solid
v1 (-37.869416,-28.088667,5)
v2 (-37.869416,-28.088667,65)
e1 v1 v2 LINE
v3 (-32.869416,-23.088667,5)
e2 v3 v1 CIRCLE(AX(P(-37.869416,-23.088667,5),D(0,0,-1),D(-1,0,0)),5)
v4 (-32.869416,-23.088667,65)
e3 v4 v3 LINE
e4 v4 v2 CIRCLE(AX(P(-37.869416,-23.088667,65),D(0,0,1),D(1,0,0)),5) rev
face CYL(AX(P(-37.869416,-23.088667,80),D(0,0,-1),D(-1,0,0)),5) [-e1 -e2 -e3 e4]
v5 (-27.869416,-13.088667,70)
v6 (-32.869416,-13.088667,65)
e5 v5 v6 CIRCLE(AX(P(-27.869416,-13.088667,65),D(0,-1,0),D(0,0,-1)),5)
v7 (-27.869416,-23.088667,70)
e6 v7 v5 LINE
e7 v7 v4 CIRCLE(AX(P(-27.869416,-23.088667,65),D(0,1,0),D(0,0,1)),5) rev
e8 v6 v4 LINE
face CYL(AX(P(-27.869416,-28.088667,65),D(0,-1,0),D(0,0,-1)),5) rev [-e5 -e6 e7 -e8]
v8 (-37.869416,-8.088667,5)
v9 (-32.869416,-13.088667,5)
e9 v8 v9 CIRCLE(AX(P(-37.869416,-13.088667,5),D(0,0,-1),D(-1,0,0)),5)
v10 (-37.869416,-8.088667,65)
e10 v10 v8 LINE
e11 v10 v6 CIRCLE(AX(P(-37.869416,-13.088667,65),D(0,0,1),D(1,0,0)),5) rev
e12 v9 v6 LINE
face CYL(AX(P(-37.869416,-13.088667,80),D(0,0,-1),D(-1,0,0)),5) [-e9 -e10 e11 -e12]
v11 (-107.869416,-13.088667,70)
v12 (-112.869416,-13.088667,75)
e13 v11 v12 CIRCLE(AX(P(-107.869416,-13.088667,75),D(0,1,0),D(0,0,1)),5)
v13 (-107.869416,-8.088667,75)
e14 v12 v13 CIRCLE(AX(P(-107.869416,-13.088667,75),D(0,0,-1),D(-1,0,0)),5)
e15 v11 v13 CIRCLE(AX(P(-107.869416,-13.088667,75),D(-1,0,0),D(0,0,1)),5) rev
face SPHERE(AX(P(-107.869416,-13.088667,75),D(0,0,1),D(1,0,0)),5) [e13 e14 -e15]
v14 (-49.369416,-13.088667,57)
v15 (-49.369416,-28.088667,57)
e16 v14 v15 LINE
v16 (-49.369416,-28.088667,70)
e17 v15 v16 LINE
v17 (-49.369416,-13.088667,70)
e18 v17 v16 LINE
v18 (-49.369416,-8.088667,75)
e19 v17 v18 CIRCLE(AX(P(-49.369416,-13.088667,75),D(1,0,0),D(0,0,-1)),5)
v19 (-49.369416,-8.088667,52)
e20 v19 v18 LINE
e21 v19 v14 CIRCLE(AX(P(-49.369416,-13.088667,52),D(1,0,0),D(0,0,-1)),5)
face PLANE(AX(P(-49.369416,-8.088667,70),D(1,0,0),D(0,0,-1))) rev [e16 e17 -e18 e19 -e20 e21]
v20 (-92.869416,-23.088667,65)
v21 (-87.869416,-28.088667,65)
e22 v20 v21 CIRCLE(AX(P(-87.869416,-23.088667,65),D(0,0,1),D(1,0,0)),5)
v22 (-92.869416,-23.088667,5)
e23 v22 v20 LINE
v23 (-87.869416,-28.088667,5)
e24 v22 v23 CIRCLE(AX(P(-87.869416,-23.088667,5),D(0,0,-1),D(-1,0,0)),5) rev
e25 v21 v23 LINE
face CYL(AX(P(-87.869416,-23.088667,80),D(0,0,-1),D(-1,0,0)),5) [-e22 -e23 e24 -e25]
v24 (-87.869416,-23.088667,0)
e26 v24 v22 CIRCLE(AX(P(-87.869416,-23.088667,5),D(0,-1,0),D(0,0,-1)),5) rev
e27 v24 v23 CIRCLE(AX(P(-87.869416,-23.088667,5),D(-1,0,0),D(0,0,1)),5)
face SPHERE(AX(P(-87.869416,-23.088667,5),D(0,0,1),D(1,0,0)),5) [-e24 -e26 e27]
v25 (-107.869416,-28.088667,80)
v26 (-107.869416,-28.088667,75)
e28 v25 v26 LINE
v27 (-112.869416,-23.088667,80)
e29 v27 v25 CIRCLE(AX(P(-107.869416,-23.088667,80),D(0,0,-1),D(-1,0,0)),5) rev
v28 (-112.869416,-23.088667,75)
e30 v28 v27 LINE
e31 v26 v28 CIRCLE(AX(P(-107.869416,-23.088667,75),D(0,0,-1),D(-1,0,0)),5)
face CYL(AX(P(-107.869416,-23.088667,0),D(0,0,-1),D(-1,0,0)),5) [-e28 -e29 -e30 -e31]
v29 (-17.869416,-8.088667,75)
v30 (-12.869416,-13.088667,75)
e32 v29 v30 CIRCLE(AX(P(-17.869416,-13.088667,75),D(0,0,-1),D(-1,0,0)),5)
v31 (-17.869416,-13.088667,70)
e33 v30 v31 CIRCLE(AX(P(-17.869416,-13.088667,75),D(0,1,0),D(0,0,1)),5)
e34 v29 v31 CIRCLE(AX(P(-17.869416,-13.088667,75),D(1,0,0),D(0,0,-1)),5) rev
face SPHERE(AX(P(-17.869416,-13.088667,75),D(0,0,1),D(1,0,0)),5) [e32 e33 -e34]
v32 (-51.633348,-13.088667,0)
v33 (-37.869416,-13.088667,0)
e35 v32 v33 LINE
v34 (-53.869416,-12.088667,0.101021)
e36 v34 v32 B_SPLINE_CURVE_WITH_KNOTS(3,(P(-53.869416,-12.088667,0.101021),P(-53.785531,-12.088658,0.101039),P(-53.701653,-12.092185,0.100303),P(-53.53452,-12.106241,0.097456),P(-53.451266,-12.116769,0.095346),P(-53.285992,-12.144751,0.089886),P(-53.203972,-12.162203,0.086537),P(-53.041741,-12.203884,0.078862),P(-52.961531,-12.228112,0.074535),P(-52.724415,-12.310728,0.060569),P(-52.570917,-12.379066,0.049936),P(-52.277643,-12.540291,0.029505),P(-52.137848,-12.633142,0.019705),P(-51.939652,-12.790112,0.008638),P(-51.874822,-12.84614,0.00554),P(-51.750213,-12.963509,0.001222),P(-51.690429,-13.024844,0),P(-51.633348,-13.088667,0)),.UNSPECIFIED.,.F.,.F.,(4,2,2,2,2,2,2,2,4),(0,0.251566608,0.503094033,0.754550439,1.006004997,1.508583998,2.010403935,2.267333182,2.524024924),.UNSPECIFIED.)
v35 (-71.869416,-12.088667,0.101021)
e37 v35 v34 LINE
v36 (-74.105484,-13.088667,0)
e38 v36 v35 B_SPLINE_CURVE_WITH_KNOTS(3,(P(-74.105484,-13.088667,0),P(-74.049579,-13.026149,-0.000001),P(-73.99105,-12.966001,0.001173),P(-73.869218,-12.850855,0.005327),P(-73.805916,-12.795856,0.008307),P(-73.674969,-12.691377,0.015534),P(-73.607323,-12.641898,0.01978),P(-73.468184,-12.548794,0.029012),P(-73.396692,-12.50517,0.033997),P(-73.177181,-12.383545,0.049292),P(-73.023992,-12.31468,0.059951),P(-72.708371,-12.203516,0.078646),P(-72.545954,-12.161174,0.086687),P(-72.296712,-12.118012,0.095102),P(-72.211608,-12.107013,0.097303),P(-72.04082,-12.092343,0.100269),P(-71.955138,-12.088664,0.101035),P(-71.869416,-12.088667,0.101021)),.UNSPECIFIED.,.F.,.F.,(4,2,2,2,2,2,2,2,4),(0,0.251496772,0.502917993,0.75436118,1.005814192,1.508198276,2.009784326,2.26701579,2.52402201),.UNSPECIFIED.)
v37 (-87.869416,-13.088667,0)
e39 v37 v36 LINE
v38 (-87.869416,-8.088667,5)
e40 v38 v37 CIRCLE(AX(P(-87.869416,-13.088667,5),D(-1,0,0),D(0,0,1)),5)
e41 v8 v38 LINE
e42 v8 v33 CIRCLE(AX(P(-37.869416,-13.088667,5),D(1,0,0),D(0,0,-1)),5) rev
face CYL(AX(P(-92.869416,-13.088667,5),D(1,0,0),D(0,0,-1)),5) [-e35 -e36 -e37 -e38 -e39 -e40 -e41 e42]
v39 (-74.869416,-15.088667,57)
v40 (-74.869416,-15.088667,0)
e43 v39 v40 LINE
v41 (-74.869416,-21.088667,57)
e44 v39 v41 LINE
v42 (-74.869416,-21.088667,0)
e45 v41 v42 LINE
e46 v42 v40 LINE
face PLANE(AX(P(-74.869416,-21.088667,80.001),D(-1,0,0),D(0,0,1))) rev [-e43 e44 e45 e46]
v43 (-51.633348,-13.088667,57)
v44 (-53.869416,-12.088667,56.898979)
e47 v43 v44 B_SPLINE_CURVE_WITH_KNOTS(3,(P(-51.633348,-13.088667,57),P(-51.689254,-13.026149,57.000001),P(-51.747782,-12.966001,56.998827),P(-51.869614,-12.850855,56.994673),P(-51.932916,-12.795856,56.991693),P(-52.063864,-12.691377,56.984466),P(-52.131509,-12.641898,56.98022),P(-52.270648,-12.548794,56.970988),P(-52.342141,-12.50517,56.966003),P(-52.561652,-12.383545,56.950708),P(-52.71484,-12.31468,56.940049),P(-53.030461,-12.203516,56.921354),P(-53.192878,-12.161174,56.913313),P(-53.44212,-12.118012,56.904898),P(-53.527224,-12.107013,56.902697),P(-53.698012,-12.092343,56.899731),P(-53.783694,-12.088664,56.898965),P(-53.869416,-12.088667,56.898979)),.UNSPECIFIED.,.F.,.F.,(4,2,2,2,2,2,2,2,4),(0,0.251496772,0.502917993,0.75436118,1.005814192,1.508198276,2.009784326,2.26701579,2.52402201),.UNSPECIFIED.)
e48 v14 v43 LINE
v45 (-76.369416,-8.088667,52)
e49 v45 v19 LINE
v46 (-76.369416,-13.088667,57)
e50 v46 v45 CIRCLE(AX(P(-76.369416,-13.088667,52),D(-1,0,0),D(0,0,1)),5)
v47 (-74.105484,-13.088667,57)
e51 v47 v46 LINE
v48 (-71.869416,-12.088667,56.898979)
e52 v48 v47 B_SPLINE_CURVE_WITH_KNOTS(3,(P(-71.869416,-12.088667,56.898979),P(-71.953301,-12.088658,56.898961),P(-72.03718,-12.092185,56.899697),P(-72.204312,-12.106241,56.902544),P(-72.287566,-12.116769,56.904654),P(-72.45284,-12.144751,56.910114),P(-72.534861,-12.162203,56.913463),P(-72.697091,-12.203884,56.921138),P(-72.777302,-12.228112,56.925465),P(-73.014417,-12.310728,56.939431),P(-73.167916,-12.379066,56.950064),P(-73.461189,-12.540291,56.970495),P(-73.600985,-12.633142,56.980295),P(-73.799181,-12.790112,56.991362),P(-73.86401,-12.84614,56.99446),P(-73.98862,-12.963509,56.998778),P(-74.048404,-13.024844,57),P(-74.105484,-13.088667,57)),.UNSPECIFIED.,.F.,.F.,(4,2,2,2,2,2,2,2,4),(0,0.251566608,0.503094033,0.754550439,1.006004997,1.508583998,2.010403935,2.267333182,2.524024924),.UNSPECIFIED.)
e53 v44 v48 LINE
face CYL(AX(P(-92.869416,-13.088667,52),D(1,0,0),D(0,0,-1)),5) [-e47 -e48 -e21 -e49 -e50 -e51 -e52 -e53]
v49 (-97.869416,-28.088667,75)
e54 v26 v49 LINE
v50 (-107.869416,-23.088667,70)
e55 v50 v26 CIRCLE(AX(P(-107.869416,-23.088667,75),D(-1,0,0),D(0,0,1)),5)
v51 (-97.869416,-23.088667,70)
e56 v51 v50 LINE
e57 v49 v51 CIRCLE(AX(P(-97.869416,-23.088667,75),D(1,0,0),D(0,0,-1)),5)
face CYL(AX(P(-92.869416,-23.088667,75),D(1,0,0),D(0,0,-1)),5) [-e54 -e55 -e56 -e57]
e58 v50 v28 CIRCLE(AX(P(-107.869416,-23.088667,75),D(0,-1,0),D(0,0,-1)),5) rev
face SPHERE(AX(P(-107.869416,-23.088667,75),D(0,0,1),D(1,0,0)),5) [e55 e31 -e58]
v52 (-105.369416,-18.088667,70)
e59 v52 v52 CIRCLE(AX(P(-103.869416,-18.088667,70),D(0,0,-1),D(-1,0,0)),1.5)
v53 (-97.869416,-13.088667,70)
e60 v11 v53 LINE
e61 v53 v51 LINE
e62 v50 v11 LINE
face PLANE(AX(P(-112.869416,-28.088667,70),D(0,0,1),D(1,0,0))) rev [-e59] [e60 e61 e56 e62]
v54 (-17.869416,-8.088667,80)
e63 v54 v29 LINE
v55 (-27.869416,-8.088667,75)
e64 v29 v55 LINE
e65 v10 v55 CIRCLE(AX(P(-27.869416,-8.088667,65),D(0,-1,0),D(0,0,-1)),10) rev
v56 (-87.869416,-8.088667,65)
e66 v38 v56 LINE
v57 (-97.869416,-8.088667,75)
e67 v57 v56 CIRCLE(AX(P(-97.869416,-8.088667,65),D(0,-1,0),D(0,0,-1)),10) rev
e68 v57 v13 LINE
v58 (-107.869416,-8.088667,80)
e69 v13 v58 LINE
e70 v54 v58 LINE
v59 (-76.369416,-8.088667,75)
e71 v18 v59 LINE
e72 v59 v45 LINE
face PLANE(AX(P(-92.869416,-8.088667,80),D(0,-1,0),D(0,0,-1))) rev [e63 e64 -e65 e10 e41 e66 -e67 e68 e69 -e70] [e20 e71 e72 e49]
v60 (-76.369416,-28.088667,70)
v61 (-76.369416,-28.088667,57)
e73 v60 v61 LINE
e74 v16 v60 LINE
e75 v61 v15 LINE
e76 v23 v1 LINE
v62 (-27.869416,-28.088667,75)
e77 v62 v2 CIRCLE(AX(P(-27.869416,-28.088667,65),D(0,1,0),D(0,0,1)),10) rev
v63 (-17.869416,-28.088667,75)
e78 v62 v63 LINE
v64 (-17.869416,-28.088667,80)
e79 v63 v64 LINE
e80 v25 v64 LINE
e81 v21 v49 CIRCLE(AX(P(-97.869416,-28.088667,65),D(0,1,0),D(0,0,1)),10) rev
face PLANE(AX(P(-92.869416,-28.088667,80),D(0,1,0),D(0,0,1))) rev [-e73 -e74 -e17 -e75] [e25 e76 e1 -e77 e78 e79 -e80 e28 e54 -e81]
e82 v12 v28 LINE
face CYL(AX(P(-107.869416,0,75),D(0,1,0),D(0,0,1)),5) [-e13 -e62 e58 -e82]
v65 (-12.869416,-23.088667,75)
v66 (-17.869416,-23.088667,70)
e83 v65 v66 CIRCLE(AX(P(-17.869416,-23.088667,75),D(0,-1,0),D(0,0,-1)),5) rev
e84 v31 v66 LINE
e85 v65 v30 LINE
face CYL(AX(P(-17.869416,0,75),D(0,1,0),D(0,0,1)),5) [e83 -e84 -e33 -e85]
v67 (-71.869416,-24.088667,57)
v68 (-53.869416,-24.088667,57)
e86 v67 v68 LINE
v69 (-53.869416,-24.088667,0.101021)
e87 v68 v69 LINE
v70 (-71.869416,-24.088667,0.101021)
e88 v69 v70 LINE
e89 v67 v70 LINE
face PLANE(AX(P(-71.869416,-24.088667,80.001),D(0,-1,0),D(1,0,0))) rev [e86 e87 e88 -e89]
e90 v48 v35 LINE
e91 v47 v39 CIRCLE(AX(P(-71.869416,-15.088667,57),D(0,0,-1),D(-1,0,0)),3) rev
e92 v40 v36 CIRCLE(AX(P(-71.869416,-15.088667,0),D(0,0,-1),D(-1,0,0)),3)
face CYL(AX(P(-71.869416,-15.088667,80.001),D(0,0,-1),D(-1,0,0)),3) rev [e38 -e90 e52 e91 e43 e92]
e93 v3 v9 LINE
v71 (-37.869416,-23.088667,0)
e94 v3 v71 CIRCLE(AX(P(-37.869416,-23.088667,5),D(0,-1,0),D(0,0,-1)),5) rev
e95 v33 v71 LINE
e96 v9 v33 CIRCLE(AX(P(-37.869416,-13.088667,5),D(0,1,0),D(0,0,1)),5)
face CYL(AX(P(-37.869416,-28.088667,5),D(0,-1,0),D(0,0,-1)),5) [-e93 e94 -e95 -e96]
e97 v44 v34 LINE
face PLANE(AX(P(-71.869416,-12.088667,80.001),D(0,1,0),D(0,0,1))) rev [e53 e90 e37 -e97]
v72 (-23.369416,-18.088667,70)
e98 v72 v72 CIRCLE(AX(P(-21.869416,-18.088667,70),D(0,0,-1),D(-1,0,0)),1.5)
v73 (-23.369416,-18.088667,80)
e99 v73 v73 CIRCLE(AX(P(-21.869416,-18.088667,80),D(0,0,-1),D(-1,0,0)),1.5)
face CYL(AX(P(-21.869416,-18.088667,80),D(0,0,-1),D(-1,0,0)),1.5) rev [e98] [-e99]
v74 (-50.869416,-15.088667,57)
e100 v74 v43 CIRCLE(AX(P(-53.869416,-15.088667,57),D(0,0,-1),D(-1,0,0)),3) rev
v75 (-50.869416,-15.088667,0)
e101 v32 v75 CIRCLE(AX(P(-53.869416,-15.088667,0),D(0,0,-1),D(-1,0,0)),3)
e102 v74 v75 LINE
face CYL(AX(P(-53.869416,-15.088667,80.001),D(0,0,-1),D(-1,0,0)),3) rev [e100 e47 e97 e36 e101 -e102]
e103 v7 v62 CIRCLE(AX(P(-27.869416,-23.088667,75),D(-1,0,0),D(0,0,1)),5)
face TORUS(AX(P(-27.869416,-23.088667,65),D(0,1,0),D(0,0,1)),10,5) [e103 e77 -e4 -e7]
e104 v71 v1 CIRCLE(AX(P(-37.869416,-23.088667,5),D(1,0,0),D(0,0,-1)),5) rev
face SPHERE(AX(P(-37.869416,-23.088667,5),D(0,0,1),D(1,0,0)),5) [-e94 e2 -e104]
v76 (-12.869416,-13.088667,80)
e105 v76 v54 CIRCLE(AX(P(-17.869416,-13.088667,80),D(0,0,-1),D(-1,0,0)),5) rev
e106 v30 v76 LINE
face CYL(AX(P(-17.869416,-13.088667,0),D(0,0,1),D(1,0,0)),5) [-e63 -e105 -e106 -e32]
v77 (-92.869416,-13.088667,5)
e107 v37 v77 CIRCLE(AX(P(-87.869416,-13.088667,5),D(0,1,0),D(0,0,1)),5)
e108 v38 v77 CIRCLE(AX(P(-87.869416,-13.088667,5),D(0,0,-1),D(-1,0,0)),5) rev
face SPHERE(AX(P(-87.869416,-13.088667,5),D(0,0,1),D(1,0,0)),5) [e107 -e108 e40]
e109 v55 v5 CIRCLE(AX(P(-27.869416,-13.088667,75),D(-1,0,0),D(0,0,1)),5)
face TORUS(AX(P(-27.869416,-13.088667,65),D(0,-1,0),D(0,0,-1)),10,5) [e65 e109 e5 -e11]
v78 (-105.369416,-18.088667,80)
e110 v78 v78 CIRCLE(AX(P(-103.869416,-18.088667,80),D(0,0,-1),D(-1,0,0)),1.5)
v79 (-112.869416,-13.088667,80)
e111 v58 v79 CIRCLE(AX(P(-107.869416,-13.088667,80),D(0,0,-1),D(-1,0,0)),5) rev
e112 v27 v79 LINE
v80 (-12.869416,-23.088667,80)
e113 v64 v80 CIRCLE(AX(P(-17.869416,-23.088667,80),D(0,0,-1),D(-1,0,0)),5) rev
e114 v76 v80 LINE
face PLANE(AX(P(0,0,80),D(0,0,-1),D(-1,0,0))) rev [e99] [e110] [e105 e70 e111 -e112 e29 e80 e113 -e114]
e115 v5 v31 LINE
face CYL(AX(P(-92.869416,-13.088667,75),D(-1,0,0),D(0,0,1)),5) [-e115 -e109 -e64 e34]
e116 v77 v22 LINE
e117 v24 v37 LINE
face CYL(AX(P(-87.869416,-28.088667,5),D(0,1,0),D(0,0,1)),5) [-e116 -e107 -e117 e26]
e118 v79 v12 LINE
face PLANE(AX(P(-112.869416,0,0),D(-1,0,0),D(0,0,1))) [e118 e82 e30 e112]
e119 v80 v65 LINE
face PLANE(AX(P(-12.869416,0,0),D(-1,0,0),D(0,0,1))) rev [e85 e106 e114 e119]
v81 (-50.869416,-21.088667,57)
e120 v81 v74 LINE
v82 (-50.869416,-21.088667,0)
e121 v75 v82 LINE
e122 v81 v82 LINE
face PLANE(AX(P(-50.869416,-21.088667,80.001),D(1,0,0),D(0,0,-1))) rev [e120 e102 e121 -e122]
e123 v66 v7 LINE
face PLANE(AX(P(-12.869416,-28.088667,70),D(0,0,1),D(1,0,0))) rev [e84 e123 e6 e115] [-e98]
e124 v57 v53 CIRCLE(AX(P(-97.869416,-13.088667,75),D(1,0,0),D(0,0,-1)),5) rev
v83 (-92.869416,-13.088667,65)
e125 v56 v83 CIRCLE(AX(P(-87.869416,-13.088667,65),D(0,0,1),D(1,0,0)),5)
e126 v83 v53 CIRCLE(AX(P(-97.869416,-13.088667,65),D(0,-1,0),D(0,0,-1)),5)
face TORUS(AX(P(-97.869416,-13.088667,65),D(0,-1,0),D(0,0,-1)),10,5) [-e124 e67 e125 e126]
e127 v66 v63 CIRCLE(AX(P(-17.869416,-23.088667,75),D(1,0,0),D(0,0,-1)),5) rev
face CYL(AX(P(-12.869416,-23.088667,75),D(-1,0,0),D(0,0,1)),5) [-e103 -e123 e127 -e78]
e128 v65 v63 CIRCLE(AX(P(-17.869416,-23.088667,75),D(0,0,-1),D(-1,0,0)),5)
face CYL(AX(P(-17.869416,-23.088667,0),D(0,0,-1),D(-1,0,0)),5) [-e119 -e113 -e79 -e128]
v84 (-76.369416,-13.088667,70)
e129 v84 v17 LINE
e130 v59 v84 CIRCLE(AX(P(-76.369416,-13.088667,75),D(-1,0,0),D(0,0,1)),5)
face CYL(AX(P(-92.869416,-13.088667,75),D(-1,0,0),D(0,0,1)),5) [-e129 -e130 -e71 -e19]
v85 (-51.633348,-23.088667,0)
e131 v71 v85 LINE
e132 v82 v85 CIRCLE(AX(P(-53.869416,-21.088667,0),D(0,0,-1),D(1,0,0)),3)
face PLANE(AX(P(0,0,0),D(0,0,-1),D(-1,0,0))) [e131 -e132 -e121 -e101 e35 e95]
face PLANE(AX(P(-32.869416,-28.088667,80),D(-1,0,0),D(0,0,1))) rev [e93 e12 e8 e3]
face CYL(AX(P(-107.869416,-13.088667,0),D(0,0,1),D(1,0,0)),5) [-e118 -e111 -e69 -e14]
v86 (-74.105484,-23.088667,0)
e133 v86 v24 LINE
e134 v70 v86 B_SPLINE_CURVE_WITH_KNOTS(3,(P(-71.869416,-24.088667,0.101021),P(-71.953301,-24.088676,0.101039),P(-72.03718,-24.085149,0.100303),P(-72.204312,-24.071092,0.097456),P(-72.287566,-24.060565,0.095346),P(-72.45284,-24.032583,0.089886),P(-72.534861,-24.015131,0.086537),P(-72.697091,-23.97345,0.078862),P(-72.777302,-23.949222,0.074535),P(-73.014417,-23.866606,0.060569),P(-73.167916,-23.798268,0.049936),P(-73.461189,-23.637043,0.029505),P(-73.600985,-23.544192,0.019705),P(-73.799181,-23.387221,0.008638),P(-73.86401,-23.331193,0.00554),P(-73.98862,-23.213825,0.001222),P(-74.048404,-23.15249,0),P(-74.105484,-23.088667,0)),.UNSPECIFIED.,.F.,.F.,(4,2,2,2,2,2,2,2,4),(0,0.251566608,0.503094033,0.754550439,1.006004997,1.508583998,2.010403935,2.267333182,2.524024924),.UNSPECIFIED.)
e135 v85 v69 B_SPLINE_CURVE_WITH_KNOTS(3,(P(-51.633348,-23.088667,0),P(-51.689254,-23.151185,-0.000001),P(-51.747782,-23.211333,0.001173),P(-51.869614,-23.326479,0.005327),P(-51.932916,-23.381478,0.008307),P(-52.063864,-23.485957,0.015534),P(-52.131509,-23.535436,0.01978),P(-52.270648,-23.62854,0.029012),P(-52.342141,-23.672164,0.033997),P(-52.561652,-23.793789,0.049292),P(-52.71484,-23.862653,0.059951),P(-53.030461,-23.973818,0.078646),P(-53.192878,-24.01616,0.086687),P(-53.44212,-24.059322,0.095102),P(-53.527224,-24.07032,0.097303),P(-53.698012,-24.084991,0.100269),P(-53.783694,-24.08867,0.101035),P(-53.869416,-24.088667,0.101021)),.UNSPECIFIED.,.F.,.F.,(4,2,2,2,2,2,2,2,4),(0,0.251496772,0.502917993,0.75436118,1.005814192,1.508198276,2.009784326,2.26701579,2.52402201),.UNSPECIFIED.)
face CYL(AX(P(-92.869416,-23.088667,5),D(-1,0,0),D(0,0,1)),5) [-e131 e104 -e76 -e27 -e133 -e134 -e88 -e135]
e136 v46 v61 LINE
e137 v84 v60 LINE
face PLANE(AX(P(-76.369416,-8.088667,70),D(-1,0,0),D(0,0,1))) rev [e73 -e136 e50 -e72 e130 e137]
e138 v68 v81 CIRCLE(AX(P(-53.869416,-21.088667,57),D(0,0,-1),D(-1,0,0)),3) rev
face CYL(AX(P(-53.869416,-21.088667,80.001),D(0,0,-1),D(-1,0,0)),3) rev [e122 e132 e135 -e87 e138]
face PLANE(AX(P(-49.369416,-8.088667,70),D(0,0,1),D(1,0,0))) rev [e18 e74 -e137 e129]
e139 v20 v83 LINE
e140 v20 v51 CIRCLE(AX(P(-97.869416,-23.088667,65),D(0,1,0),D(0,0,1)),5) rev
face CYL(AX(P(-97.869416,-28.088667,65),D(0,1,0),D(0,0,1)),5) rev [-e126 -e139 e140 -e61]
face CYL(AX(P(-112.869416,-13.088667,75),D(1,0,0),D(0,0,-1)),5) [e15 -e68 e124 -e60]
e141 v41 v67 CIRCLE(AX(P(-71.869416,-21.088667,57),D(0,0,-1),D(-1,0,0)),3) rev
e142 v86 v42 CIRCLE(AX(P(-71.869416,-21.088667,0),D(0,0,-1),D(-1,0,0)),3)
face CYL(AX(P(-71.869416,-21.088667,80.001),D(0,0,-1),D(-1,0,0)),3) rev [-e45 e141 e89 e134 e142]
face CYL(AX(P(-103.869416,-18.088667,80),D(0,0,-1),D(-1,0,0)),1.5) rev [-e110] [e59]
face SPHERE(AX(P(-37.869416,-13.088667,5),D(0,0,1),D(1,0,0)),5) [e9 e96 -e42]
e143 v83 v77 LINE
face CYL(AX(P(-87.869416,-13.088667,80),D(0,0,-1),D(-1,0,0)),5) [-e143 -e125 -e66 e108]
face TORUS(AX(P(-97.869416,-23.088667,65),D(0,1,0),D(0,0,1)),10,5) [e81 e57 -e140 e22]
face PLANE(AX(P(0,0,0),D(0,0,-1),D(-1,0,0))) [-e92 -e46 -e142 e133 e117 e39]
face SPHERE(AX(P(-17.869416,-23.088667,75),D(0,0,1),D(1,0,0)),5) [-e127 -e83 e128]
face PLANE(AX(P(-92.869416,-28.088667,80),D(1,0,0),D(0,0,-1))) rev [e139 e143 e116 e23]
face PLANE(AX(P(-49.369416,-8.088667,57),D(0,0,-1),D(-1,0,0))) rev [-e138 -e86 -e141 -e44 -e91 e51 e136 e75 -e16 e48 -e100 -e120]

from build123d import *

# Parameters (mm, degrees)
ESBO_O1_W                = 60
ESBO_O1_H                = 20
RESSALTO_EXTRUS_O1_DEPTH = 80
ESBO_O4_W                = 27
ESBO_O4_H                = 13
CORTE_EXTRUS_O2_DEPTH    = 125.196330299
ESBO_O6_W                = 10
ESBO_O6_H                = 20
RESSALTO_EXTRUS_O2_DEPTH = 20
ESBO_O5_W                = 10
ESBO_O5_H                = 20
RESSALTO_EXTRUS_O3_DEPTH = 20
CORTE_EXTRUS_O4_REACH    = 143.168
FILETE1_R                = 5
ESBO_O8_R                = 1.5
CORTE_EXTRUS_O5_DEPTH    = 136.751531604
FILETE2_R                = 5


with BuildPart() as part:
    # Esboço1 → Ressalto-extrusão1 (new body)
    with BuildSketch(Plane.XY):
        with Locations((-62.86941617, -18.088666872)):
            Rectangle(ESBO_O1_W, ESBO_O1_H)
    extrude(amount=RESSALTO_EXTRUS_O1_DEPTH)

    # Esboço4 → Corte-extrusão2 (cut, through all)
    with BuildSketch(Plane(origin=(0, -28.088666872, 0), x_dir=(-1, 0, 0), z_dir=(0, -1, 0))):
        with Locations((62.86941617, -63.5)):
            Rectangle(ESBO_O4_W, ESBO_O4_H)
    extrude(amount=-CORTE_EXTRUS_O2_DEPTH, mode=Mode.SUBTRACT)

    # Esboço6 → Ressalto-extrusão2 (add)
    with BuildSketch(Plane.ZY.offset(92.86941617)):
        with Locations((75, -18.088666872)):
            Rectangle(ESBO_O6_W, ESBO_O6_H)
    extrude(amount=RESSALTO_EXTRUS_O2_DEPTH)

    # Esboço5 → Ressalto-extrusão3 (add)
    with BuildSketch(Plane(origin=(-32.86941617, 0, 0), x_dir=(0, 0, -1), z_dir=(1, 0, 0))):
        with Locations((-75, -18.088666872)):
            Rectangle(ESBO_O5_W, ESBO_O5_H)
    extrude(amount=RESSALTO_EXTRUS_O3_DEPTH)

    # Esboço7 → Corte-extrusão4 (cut, up to next)
    with BuildSketch(Plane(origin=(0, 0, 0), x_dir=(-1, 0, 0), z_dir=(0, 0, -1)), mode=Mode.PRIVATE) as corte_extrus_o4_sk1:
        with BuildLine():
            Line((71.86941617, -24.088666872), (53.86941617, -24.088666872))
            ThreePointArc((53.86941617, -24.088666872), (51.748095827, -23.209987216), (50.86941617, -21.088666872))
            Line((50.86941617, -21.088666872), (50.86941617, -15.088666872))
            ThreePointArc((50.86941617, -15.088666872), (51.748095827, -12.967346529), (53.86941617, -12.088666872))
            Line((53.86941617, -12.088666872), (71.86941617, -12.088666872))
            ThreePointArc((71.86941617, -12.088666872), (73.990736514, -12.967346529), (74.86941617, -15.088666872))
            Line((74.86941617, -15.088666872), (74.86941617, -21.088666872))
            ThreePointArc((74.86941617, -21.088666872), (73.990736514, -23.209987216), (71.86941617, -24.088666872))
        make_face()
    corte_extrus_o4_tool1 = extrude(corte_extrus_o4_sk1.sketch, amount=-CORTE_EXTRUS_O4_REACH, mode=Mode.PRIVATE) & part.part
    add(corte_extrus_o4_tool1.solids().sort_by_distance((-62.869416, -18.088667, 0))[0], mode=Mode.SUBTRACT)

    # Filete1
    # the kernel refuses this fillet: 5 mm, written as the material it adds along each edge
    with BuildSketch(Plane(origin=(-92.86941617, -28.088666872, 70), x_dir=(0, 0, -1), z_dir=(0, 1, 0)), Plane(origin=(-32.86941617, -28.088666872, 70), x_dir=(1, 0, 0), z_dir=(0, 1, 0))) as filete1_piece_1:
        with BuildLine():
            CenterArc((FILETE1_R, FILETE1_R), FILETE1_R, 180, 90)
            Line((0, FILETE1_R), (0, 0))
            Line((0, 0), (FILETE1_R, 0))
        make_face()
    extrude(amount=20)
    # the kernel refuses this fillet: 5 mm, written as the material it takes off along each edge
    with BuildSketch(Plane(origin=(-12.86941617, -8.088666872, 57.5), x_dir=(0, -1, 0), z_dir=(0, 0, 1)), Plane(origin=(-112.86941617, -28.088666872, 92.5), x_dir=(1, 0, 0), z_dir=(0, 0, -1))) as filete1_2_piece_1:
        with BuildLine():
            CenterArc((FILETE1_R, -FILETE1_R), FILETE1_R, 90, 90)
            Line((0, -FILETE1_R), (0, 0))
            Line((0, 0), (FILETE1_R, 0))
        make_face()
    extrude(amount=35, mode=Mode.SUBTRACT)
    with BuildSketch(Plane(origin=(-112.86941617, -8.088666872, 57.5), x_dir=(0, -1, 0), z_dir=(0, 0, 1)), Plane(origin=(-12.86941617, -28.088666872, 92.5), x_dir=(-1, 0, 0), z_dir=(0, 0, -1))) as filete1_2_piece_2:
        with BuildLine():
            CenterArc((FILETE1_R, FILETE1_R), FILETE1_R, 180, 90)
            Line((0, FILETE1_R), (0, 0))
            Line((0, 0), (FILETE1_R, 0))
        make_face()
    extrude(amount=35, mode=Mode.SUBTRACT)
    with BuildSketch(Plane(origin=(-112.86941617, -40.588666872, 70), x_dir=(1, 0, 0), z_dir=(0, 1, 0)), Plane(origin=(-12.86941617, -40.588666872, 70), x_dir=(0, 0, 1), z_dir=(0, 1, 0)), Plane(origin=(-92.86941617, 4.411333128, 0), x_dir=(0, 0, 1), z_dir=(0, -1, 0)), Plane(origin=(-32.86941617, -40.588666872, 0), x_dir=(0, 0, 1), z_dir=(0, 1, 0))) as filete1_2_piece_3:
        with BuildLine():
            CenterArc((FILETE1_R, -FILETE1_R), FILETE1_R, 90, 90)
            Line((0, -FILETE1_R), (0, 0))
            Line((0, 0), (FILETE1_R, 0))
        make_face()
    extrude(amount=45, mode=Mode.SUBTRACT)
    with BuildSketch(Plane(origin=(-105.36941617, -28.088666872, 0), x_dir=(0, 0, 1), z_dir=(1, 0, 0))) as filete1_2_piece_4:
        with BuildLine():
            CenterArc((FILETE1_R, -FILETE1_R), FILETE1_R, 90, 90)
            Line((0, -FILETE1_R), (0, 0))
            Line((0, 0), (FILETE1_R, 0))
        make_face()
    extrude(amount=85, mode=Mode.SUBTRACT)
    with BuildSketch(Plane(origin=(-20.36941617, -8.088666872, 0), x_dir=(0, -1, 0), z_dir=(-1, 0, 0))) as filete1_2_piece_5:
        with BuildLine():
            CenterArc((FILETE1_R, FILETE1_R), FILETE1_R, 180, 90)
            Line((0, FILETE1_R), (0, 0))
            Line((0, 0), (FILETE1_R, 0))
        make_face()
    extrude(amount=85, mode=Mode.SUBTRACT)
    # the kernel refuses this fillet: 5 mm, written as the material it takes off along each edge
    with BuildSketch(Plane(origin=(-87.86941617, -23.088666872, 5), x_dir=(-1, 0, 0), z_dir=(0, -1, 0))) as filete1_3_piece_1_section:
        Polygon((0, 0), (FILETE1_R, 0), (FILETE1_R, FILETE1_R), (0, FILETE1_R), align=None)
    filete1_3_piece_1 = extrude(amount=FILETE1_R, mode=Mode.PRIVATE)
    filete1_3_piece_1 = filete1_3_piece_1 - Plane(origin=(-87.86941617, -23.088666872, 5), x_dir=(0.7071067811865475, 0, 0.7071067811865475), z_dir=(0, -1, 0)) * Sphere(FILETE1_R, mode=Mode.PRIVATE)
    add(filete1_3_piece_1, mode=Mode.SUBTRACT)
    with BuildSketch(Plane(origin=(-87.86941617, -13.088666872, 5), x_dir=(0, 1, 0), z_dir=(-1, 0, 0))) as filete1_3_piece_2_section:
        Polygon((0, 0), (FILETE1_R, 0), (FILETE1_R, FILETE1_R), (0, FILETE1_R), align=None)
    filete1_3_piece_2 = extrude(amount=FILETE1_R, mode=Mode.PRIVATE)
    filete1_3_piece_2 = filete1_3_piece_2 - Plane(origin=(-87.86941617, -13.088666872, 5), x_dir=(0, -0.7071067811865475, 0.7071067811865475), z_dir=(-1, 0, 0)) * Sphere(FILETE1_R, mode=Mode.PRIVATE)
    add(filete1_3_piece_2, mode=Mode.SUBTRACT)
    with BuildSketch(Plane(origin=(-37.86941617, -13.088666872, 5), x_dir=(0, 1, 0), z_dir=(1, 0, 0))) as filete1_3_piece_3_section:
        Polygon((0, 0), (FILETE1_R, 0), (FILETE1_R, -FILETE1_R), (0, -FILETE1_R), align=None)
    filete1_3_piece_3 = extrude(amount=FILETE1_R, mode=Mode.PRIVATE)
    filete1_3_piece_3 = filete1_3_piece_3 - Plane(origin=(-37.86941617, -13.088666872, 5), x_dir=(0, -0.7071067811865475, 0.7071067811865475), z_dir=(1, 0, 0)) * Sphere(FILETE1_R, mode=Mode.PRIVATE)
    add(filete1_3_piece_3, mode=Mode.SUBTRACT)
    with BuildSketch(Plane(origin=(-37.86941617, -23.088666872, 5), x_dir=(1, 0, 0), z_dir=(0, -1, 0))) as filete1_3_piece_4_section:
        Polygon((0, 0), (FILETE1_R, 0), (FILETE1_R, -FILETE1_R), (0, -FILETE1_R), align=None)
    filete1_3_piece_4 = extrude(amount=FILETE1_R, mode=Mode.PRIVATE)
    filete1_3_piece_4 = filete1_3_piece_4 - Plane(origin=(-37.86941617, -23.088666872, 5), x_dir=(-0.7071067811865475, 0, 0.7071067811865475), z_dir=(0, -1, 0)) * Sphere(FILETE1_R, mode=Mode.PRIVATE)
    add(filete1_3_piece_4, mode=Mode.SUBTRACT)
    with BuildSketch(Plane(origin=(-107.86941617, -23.088666872, 75), x_dir=(0, 0, -1), z_dir=(0, -1, 0))) as filete1_3_piece_5_section:
        Polygon((0, 0), (FILETE1_R, 0), (FILETE1_R, -FILETE1_R), (0, -FILETE1_R), align=None)
    filete1_3_piece_5 = extrude(amount=FILETE1_R, mode=Mode.PRIVATE)
    filete1_3_piece_5 = filete1_3_piece_5 - Plane(origin=(-107.86941617, -23.088666872, 75), x_dir=(0.7071067811865475, 0, 0.7071067811865475), z_dir=(0, -1, 0)) * Sphere(FILETE1_R, mode=Mode.PRIVATE)
    add(filete1_3_piece_5, mode=Mode.SUBTRACT)
    with BuildSketch(Plane(origin=(-17.86941617, -13.088666872, 75), x_dir=(0, 1, 0), z_dir=(0, 0, -1))) as filete1_3_piece_6_section:
        Polygon((0, 0), (FILETE1_R, 0), (FILETE1_R, FILETE1_R), (0, FILETE1_R), align=None)
    filete1_3_piece_6 = extrude(amount=FILETE1_R, mode=Mode.PRIVATE)
    filete1_3_piece_6 = filete1_3_piece_6 - Plane(origin=(-17.86941617, -13.088666872, 75), x_dir=(-0.7071067811865475, -0.7071067811865475, 0), z_dir=(0, 0, -1)) * Sphere(FILETE1_R, mode=Mode.PRIVATE)
    add(filete1_3_piece_6, mode=Mode.SUBTRACT)
    with BuildSketch(Plane(origin=(-17.86941617, -23.088666872, 75), x_dir=(0, 0, -1), z_dir=(0, -1, 0))) as filete1_3_piece_7_section:
        Polygon((0, 0), (FILETE1_R, 0), (FILETE1_R, FILETE1_R), (0, FILETE1_R), align=None)
    filete1_3_piece_7 = extrude(amount=FILETE1_R, mode=Mode.PRIVATE)
    filete1_3_piece_7 = filete1_3_piece_7 - Plane(origin=(-17.86941617, -23.088666872, 75), x_dir=(-0.7071067811865475, 0, 0.7071067811865475), z_dir=(0, -1, 0)) * Sphere(FILETE1_R, mode=Mode.PRIVATE)
    add(filete1_3_piece_7, mode=Mode.SUBTRACT)
    with BuildSketch(Plane(origin=(-107.86941617, -13.088666872, 75), x_dir=(0, 1, 0), z_dir=(0, 0, -1))) as filete1_3_piece_8_section:
        Polygon((0, 0), (FILETE1_R, 0), (FILETE1_R, -FILETE1_R), (0, -FILETE1_R), align=None)
    filete1_3_piece_8 = extrude(amount=FILETE1_R, mode=Mode.PRIVATE)
    filete1_3_piece_8 = filete1_3_piece_8 - Plane(origin=(-107.86941617, -13.088666872, 75), x_dir=(0.7071067811865475, -0.7071067811865475, 0), z_dir=(0, 0, -1)) * Sphere(FILETE1_R, mode=Mode.PRIVATE)
    add(filete1_3_piece_8, mode=Mode.SUBTRACT)
    with BuildSketch(Plane(origin=(-97.86941617, -8.088666872, 70), x_dir=(0, -1, 0), z_dir=(-1, 0, 0)), Plane(origin=(-97.86941617, -28.088666872, 70), x_dir=(0, 0, 1), z_dir=(-1, 0, 0))) as filete1_3_piece_9:
        with BuildLine():
            CenterArc((FILETE1_R, FILETE1_R), FILETE1_R, 180, 90)
            Line((0, FILETE1_R), (0, 0))
            Line((0, 0), (FILETE1_R, 0))
        make_face()
    extrude(amount=10, mode=Mode.SUBTRACT)
    with BuildSketch(Plane(origin=(-27.86941617, -28.088666872, 70), x_dir=(0, 0, 1), z_dir=(1, 0, 0)), Plane(origin=(-27.86941617, -8.088666872, 70), x_dir=(0, -1, 0), z_dir=(1, 0, 0))) as filete1_3_piece_10:
        with BuildLine():
            CenterArc((FILETE1_R, -FILETE1_R), FILETE1_R, 90, 90)
            Line((0, -FILETE1_R), (0, 0))
            Line((0, 0), (FILETE1_R, 0))
        make_face()
    extrude(amount=10, mode=Mode.SUBTRACT)
    with BuildSketch(Plane(origin=(-32.86941617, -28.088666872, 5), x_dir=(-1, 0, 0), z_dir=(0, 0, 1)), Plane(origin=(-32.86941617, -8.088666872, 5), x_dir=(0, -1, 0), z_dir=(0, 0, 1))) as filete1_3_piece_11:
        with BuildLine():
            CenterArc((FILETE1_R, -FILETE1_R), FILETE1_R, 90, 90)
            Line((0, -FILETE1_R), (0, 0))
            Line((0, 0), (FILETE1_R, 0))
        make_face()
    extrude(amount=60, mode=Mode.SUBTRACT)
    with BuildSketch(Plane(origin=(-92.86941617, -8.088666872, 5), x_dir=(0, -1, 0), z_dir=(0, 0, 1)), Plane(origin=(-92.86941617, -28.088666872, 5), x_dir=(1, 0, 0), z_dir=(0, 0, 1))) as filete1_3_piece_12:
        with BuildLine():
            CenterArc((FILETE1_R, FILETE1_R), FILETE1_R, 180, 90)
            Line((0, FILETE1_R), (0, 0))
            Line((0, 0), (FILETE1_R, 0))
        make_face()
    extrude(amount=60, mode=Mode.SUBTRACT)
    with BuildSketch(Plane(origin=(-97.86941617, -28.088666872, 65), x_dir=(1, 0, 0), z_dir=(0, 0, -1))) as filete1_3_piece_13:
        with BuildLine():
            CenterArc((5 + FILETE1_R, -FILETE1_R), FILETE1_R, 90, 90)
            Line((5, -FILETE1_R), (5, 0))
            Line((5, 0), (5 + FILETE1_R, 0))
        make_face()
    revolve(axis=Axis((-97.86941617, -28.088666872, 65), (0, -1, 0)), revolution_arc=90, mode=Mode.SUBTRACT)
    with BuildSketch(Plane(origin=(-97.86941617, -8.088666872, 65), x_dir=(1, 0, 0), z_dir=(0, 0, -1))) as filete1_3_piece_14:
        with BuildLine():
            CenterArc((5 + FILETE1_R, FILETE1_R), FILETE1_R, 180, 90)
            Line((5 + FILETE1_R, 0), (5, 0))
            Line((5, 0), (5, FILETE1_R))
        make_face()
    revolve(axis=Axis((-97.86941617, -8.088666872, 65), (0, -1, 0)), revolution_arc=90, mode=Mode.SUBTRACT)
    with BuildSketch(Plane(origin=(-27.86941617, -8.088666872, 65), x_dir=(0, 0, 1), z_dir=(1, 0, 0))) as filete1_3_piece_15:
        with BuildLine():
            CenterArc((5 + FILETE1_R, FILETE1_R), FILETE1_R, 180, 90)
            Line((5 + FILETE1_R, 0), (5, 0))
            Line((5, 0), (5, FILETE1_R))
        make_face()
    revolve(axis=Axis((-27.86941617, -8.088666872, 65), (0, -1, 0)), revolution_arc=90, mode=Mode.SUBTRACT)
    with BuildSketch(Plane(origin=(-27.86941617, -28.088666872, 65), x_dir=(0, 0, 1), z_dir=(1, 0, 0))) as filete1_3_piece_16:
        with BuildLine():
            CenterArc((5 + FILETE1_R, -FILETE1_R), FILETE1_R, 90, 90)
            Line((5, -FILETE1_R), (5, 0))
            Line((5, 0), (5 + FILETE1_R, 0))
        make_face()
    revolve(axis=Axis((-27.86941617, -28.088666872, 65), (0, -1, 0)), revolution_arc=90, mode=Mode.SUBTRACT)

    # Esboço8 → Corte-extrusão5 (cut, through all)
    with BuildSketch(Plane(origin=(0, 0, 70), x_dir=(-1, 0, 0), z_dir=(0, 0, -1))):
        with Locations((21.86941617, -18.088666872)):
            Circle(ESBO_O8_R)
        with Locations((103.86941617, -18.088666872)):
            Circle(ESBO_O8_R)
    extrude(amount=-CORTE_EXTRUS_O5_DEPTH, mode=Mode.SUBTRACT)

    # Filete2
    # the kernel refuses this fillet: 5 mm, written as the material it takes off along each edge
    with BuildSketch(Plane(origin=(-49.36941617, -8.088666872, 70), x_dir=(0, 0, 1), z_dir=(-1, 0, 0)), Plane(origin=(-76.36941617, -8.088666872, 57), x_dir=(0, 0, -1), z_dir=(1, 0, 0))) as filete2_piece_1:
        with BuildLine():
            CenterArc((FILETE2_R, -FILETE2_R), FILETE2_R, 90, 90)
            Line((0, -FILETE2_R), (0, 0))
            Line((0, 0), (FILETE2_R, 0))
        make_face()
    extrude(amount=27, mode=Mode.SUBTRACT)


solid = part.part
